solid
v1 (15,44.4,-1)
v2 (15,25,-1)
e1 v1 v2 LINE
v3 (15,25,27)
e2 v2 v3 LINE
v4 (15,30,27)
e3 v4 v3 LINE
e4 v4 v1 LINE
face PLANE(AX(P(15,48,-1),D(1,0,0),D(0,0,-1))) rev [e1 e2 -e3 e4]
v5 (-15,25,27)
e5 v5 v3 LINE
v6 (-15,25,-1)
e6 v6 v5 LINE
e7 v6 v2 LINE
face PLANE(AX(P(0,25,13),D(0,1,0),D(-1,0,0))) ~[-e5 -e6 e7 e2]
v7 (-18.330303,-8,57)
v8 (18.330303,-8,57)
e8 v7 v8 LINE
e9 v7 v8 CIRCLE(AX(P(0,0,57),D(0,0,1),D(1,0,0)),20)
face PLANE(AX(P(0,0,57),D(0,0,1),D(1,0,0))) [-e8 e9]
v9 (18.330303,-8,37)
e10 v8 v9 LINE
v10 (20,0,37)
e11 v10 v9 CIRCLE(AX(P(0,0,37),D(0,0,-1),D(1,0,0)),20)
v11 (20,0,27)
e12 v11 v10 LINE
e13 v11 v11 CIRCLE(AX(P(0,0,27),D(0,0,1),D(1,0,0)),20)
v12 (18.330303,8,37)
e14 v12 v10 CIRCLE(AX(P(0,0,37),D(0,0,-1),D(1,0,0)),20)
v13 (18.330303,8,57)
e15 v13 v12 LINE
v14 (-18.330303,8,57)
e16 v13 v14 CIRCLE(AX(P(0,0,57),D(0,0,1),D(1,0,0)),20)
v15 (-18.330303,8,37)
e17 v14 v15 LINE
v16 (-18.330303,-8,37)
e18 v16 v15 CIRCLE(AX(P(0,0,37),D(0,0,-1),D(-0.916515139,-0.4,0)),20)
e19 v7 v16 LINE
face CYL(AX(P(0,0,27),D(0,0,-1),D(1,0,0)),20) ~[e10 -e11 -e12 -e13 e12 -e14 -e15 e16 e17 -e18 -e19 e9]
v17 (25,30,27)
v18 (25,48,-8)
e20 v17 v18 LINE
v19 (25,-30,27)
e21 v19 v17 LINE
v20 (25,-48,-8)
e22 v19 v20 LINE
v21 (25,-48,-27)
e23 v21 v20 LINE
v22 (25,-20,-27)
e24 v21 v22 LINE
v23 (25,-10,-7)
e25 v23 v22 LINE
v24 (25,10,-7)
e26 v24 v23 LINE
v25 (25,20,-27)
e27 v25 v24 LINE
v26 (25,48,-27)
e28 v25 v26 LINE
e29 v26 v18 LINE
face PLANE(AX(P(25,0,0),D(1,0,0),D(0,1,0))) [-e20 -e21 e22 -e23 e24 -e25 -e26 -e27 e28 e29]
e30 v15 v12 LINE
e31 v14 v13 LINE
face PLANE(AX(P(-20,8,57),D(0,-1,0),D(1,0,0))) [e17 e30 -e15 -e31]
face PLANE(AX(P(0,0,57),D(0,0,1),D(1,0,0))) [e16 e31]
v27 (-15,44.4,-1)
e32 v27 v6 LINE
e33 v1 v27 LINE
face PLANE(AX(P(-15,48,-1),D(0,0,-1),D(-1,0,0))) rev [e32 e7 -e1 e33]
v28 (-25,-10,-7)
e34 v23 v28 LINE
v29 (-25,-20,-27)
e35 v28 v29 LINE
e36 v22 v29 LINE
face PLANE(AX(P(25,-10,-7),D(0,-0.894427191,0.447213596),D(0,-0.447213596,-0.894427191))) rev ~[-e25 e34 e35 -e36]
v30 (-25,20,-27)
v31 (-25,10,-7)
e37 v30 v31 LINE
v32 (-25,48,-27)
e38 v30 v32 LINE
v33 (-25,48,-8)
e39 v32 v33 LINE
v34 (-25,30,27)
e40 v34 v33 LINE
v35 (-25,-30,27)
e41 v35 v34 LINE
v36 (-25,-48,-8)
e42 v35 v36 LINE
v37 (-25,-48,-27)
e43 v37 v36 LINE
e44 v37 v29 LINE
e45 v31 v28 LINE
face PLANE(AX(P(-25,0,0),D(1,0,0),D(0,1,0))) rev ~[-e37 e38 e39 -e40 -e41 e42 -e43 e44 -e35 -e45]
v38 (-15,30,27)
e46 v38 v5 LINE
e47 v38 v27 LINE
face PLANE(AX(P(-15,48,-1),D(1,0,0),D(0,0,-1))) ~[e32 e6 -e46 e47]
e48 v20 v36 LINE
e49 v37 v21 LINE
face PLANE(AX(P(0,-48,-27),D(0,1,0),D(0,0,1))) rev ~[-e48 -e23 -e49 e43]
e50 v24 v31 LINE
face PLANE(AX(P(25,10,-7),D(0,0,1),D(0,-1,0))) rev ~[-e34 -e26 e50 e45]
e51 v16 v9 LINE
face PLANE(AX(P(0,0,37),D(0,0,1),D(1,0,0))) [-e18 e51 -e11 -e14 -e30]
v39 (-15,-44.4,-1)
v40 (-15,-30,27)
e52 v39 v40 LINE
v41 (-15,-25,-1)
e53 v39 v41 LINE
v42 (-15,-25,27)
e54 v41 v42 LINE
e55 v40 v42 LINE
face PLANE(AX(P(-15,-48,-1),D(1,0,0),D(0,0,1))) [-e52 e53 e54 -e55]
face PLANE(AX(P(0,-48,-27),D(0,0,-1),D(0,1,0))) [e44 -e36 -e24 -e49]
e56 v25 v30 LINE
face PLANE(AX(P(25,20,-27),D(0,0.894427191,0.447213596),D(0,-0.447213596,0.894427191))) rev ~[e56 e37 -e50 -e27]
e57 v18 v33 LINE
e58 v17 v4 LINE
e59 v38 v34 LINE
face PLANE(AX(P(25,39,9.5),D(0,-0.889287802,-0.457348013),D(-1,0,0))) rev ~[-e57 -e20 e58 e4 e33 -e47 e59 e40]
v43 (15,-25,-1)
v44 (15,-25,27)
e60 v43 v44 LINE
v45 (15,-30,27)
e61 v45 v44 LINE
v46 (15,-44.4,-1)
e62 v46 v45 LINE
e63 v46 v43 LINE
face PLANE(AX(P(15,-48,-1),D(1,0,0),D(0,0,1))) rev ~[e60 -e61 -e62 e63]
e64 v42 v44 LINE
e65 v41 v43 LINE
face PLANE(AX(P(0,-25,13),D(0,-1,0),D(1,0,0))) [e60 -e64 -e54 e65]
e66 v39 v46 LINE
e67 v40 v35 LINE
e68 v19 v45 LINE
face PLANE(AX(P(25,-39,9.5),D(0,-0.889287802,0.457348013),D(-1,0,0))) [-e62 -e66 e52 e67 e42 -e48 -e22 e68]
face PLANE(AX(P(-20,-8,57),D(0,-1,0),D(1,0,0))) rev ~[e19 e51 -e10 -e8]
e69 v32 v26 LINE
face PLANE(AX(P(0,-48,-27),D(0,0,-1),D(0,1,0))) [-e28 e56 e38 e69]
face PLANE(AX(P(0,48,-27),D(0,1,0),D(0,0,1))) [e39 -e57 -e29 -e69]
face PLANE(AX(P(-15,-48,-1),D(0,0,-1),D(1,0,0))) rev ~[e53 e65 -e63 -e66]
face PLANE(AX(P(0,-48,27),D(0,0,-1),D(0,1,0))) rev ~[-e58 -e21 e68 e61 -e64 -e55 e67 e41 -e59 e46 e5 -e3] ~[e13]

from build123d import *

# Parameters (mm, degrees)
F0_W      = 96
F0_H      = 54
F1_DEPTH  = 25
F2_SIZE2  = 35
F2_SIZE   = 18
F4_DEPTH  = 50.001
F5_R      = 20
F6_DEPTH  = 30
F7_W      = 40
F7_H      = 16
F8_DEPTH  = 20
F9_W      = 30
F9_H      = 28
F10_DEPTH = 23


# Not quite as in the source:
# - a pattern or mirror of a feature is missing from the dataset's text; its kind, count and spacing are read off the source's solid


with BuildPart() as f1:
    # F0 (on Right) → F1 (new body, symmetric)
    with BuildSketch(Plane.YZ):
        Rectangle(F0_W, F0_H)
    extrude(amount=F1_DEPTH, both=True)

    # F2
    f2_edges = [f1.edges().sort_by_distance(p)[0] for p in [
        (0, -48, 27),
        (0, 48, 27),
    ]]
    f2_side = f1.faces().sort_by_distance((0, 0, 27))[0]
    chamfer(f2_edges, length=F2_SIZE, length2=F2_SIZE2, reference=f2_side)

    # F3 (on face) → F4 (cut, through all)
    with BuildSketch(Plane.YZ.offset(25)):
        Polygon((-10, -7), (-20, -27), (20, -27), (10, -7), align=None)
    extrude(amount=-F4_DEPTH, mode=Mode.SUBTRACT)

    # F5 (on face) → F6 (join)
    with BuildSketch(Plane.XY.offset(27)):
        Circle(F5_R)
    extrude(amount=F6_DEPTH)

    # F7 (on face) → F8 (cut)
    with BuildSketch(Plane.XY.offset(57)):
        Rectangle(F7_W, F7_H)
    extrude(amount=-F8_DEPTH, mode=Mode.SUBTRACT)

    # F9 (on face) → F10 (cut)
    with BuildSketch(Plane.XZ.offset(48)):
        with Locations((0, 13)):
            Rectangle(F9_W, F9_H)
    f10 = extrude(amount=-F10_DEPTH, mode=Mode.SUBTRACT)

    # F10_copies: F10 across plane
    add(f10.mirror(Plane.ZX), mode=Mode.SUBTRACT)


solid = f1.part
